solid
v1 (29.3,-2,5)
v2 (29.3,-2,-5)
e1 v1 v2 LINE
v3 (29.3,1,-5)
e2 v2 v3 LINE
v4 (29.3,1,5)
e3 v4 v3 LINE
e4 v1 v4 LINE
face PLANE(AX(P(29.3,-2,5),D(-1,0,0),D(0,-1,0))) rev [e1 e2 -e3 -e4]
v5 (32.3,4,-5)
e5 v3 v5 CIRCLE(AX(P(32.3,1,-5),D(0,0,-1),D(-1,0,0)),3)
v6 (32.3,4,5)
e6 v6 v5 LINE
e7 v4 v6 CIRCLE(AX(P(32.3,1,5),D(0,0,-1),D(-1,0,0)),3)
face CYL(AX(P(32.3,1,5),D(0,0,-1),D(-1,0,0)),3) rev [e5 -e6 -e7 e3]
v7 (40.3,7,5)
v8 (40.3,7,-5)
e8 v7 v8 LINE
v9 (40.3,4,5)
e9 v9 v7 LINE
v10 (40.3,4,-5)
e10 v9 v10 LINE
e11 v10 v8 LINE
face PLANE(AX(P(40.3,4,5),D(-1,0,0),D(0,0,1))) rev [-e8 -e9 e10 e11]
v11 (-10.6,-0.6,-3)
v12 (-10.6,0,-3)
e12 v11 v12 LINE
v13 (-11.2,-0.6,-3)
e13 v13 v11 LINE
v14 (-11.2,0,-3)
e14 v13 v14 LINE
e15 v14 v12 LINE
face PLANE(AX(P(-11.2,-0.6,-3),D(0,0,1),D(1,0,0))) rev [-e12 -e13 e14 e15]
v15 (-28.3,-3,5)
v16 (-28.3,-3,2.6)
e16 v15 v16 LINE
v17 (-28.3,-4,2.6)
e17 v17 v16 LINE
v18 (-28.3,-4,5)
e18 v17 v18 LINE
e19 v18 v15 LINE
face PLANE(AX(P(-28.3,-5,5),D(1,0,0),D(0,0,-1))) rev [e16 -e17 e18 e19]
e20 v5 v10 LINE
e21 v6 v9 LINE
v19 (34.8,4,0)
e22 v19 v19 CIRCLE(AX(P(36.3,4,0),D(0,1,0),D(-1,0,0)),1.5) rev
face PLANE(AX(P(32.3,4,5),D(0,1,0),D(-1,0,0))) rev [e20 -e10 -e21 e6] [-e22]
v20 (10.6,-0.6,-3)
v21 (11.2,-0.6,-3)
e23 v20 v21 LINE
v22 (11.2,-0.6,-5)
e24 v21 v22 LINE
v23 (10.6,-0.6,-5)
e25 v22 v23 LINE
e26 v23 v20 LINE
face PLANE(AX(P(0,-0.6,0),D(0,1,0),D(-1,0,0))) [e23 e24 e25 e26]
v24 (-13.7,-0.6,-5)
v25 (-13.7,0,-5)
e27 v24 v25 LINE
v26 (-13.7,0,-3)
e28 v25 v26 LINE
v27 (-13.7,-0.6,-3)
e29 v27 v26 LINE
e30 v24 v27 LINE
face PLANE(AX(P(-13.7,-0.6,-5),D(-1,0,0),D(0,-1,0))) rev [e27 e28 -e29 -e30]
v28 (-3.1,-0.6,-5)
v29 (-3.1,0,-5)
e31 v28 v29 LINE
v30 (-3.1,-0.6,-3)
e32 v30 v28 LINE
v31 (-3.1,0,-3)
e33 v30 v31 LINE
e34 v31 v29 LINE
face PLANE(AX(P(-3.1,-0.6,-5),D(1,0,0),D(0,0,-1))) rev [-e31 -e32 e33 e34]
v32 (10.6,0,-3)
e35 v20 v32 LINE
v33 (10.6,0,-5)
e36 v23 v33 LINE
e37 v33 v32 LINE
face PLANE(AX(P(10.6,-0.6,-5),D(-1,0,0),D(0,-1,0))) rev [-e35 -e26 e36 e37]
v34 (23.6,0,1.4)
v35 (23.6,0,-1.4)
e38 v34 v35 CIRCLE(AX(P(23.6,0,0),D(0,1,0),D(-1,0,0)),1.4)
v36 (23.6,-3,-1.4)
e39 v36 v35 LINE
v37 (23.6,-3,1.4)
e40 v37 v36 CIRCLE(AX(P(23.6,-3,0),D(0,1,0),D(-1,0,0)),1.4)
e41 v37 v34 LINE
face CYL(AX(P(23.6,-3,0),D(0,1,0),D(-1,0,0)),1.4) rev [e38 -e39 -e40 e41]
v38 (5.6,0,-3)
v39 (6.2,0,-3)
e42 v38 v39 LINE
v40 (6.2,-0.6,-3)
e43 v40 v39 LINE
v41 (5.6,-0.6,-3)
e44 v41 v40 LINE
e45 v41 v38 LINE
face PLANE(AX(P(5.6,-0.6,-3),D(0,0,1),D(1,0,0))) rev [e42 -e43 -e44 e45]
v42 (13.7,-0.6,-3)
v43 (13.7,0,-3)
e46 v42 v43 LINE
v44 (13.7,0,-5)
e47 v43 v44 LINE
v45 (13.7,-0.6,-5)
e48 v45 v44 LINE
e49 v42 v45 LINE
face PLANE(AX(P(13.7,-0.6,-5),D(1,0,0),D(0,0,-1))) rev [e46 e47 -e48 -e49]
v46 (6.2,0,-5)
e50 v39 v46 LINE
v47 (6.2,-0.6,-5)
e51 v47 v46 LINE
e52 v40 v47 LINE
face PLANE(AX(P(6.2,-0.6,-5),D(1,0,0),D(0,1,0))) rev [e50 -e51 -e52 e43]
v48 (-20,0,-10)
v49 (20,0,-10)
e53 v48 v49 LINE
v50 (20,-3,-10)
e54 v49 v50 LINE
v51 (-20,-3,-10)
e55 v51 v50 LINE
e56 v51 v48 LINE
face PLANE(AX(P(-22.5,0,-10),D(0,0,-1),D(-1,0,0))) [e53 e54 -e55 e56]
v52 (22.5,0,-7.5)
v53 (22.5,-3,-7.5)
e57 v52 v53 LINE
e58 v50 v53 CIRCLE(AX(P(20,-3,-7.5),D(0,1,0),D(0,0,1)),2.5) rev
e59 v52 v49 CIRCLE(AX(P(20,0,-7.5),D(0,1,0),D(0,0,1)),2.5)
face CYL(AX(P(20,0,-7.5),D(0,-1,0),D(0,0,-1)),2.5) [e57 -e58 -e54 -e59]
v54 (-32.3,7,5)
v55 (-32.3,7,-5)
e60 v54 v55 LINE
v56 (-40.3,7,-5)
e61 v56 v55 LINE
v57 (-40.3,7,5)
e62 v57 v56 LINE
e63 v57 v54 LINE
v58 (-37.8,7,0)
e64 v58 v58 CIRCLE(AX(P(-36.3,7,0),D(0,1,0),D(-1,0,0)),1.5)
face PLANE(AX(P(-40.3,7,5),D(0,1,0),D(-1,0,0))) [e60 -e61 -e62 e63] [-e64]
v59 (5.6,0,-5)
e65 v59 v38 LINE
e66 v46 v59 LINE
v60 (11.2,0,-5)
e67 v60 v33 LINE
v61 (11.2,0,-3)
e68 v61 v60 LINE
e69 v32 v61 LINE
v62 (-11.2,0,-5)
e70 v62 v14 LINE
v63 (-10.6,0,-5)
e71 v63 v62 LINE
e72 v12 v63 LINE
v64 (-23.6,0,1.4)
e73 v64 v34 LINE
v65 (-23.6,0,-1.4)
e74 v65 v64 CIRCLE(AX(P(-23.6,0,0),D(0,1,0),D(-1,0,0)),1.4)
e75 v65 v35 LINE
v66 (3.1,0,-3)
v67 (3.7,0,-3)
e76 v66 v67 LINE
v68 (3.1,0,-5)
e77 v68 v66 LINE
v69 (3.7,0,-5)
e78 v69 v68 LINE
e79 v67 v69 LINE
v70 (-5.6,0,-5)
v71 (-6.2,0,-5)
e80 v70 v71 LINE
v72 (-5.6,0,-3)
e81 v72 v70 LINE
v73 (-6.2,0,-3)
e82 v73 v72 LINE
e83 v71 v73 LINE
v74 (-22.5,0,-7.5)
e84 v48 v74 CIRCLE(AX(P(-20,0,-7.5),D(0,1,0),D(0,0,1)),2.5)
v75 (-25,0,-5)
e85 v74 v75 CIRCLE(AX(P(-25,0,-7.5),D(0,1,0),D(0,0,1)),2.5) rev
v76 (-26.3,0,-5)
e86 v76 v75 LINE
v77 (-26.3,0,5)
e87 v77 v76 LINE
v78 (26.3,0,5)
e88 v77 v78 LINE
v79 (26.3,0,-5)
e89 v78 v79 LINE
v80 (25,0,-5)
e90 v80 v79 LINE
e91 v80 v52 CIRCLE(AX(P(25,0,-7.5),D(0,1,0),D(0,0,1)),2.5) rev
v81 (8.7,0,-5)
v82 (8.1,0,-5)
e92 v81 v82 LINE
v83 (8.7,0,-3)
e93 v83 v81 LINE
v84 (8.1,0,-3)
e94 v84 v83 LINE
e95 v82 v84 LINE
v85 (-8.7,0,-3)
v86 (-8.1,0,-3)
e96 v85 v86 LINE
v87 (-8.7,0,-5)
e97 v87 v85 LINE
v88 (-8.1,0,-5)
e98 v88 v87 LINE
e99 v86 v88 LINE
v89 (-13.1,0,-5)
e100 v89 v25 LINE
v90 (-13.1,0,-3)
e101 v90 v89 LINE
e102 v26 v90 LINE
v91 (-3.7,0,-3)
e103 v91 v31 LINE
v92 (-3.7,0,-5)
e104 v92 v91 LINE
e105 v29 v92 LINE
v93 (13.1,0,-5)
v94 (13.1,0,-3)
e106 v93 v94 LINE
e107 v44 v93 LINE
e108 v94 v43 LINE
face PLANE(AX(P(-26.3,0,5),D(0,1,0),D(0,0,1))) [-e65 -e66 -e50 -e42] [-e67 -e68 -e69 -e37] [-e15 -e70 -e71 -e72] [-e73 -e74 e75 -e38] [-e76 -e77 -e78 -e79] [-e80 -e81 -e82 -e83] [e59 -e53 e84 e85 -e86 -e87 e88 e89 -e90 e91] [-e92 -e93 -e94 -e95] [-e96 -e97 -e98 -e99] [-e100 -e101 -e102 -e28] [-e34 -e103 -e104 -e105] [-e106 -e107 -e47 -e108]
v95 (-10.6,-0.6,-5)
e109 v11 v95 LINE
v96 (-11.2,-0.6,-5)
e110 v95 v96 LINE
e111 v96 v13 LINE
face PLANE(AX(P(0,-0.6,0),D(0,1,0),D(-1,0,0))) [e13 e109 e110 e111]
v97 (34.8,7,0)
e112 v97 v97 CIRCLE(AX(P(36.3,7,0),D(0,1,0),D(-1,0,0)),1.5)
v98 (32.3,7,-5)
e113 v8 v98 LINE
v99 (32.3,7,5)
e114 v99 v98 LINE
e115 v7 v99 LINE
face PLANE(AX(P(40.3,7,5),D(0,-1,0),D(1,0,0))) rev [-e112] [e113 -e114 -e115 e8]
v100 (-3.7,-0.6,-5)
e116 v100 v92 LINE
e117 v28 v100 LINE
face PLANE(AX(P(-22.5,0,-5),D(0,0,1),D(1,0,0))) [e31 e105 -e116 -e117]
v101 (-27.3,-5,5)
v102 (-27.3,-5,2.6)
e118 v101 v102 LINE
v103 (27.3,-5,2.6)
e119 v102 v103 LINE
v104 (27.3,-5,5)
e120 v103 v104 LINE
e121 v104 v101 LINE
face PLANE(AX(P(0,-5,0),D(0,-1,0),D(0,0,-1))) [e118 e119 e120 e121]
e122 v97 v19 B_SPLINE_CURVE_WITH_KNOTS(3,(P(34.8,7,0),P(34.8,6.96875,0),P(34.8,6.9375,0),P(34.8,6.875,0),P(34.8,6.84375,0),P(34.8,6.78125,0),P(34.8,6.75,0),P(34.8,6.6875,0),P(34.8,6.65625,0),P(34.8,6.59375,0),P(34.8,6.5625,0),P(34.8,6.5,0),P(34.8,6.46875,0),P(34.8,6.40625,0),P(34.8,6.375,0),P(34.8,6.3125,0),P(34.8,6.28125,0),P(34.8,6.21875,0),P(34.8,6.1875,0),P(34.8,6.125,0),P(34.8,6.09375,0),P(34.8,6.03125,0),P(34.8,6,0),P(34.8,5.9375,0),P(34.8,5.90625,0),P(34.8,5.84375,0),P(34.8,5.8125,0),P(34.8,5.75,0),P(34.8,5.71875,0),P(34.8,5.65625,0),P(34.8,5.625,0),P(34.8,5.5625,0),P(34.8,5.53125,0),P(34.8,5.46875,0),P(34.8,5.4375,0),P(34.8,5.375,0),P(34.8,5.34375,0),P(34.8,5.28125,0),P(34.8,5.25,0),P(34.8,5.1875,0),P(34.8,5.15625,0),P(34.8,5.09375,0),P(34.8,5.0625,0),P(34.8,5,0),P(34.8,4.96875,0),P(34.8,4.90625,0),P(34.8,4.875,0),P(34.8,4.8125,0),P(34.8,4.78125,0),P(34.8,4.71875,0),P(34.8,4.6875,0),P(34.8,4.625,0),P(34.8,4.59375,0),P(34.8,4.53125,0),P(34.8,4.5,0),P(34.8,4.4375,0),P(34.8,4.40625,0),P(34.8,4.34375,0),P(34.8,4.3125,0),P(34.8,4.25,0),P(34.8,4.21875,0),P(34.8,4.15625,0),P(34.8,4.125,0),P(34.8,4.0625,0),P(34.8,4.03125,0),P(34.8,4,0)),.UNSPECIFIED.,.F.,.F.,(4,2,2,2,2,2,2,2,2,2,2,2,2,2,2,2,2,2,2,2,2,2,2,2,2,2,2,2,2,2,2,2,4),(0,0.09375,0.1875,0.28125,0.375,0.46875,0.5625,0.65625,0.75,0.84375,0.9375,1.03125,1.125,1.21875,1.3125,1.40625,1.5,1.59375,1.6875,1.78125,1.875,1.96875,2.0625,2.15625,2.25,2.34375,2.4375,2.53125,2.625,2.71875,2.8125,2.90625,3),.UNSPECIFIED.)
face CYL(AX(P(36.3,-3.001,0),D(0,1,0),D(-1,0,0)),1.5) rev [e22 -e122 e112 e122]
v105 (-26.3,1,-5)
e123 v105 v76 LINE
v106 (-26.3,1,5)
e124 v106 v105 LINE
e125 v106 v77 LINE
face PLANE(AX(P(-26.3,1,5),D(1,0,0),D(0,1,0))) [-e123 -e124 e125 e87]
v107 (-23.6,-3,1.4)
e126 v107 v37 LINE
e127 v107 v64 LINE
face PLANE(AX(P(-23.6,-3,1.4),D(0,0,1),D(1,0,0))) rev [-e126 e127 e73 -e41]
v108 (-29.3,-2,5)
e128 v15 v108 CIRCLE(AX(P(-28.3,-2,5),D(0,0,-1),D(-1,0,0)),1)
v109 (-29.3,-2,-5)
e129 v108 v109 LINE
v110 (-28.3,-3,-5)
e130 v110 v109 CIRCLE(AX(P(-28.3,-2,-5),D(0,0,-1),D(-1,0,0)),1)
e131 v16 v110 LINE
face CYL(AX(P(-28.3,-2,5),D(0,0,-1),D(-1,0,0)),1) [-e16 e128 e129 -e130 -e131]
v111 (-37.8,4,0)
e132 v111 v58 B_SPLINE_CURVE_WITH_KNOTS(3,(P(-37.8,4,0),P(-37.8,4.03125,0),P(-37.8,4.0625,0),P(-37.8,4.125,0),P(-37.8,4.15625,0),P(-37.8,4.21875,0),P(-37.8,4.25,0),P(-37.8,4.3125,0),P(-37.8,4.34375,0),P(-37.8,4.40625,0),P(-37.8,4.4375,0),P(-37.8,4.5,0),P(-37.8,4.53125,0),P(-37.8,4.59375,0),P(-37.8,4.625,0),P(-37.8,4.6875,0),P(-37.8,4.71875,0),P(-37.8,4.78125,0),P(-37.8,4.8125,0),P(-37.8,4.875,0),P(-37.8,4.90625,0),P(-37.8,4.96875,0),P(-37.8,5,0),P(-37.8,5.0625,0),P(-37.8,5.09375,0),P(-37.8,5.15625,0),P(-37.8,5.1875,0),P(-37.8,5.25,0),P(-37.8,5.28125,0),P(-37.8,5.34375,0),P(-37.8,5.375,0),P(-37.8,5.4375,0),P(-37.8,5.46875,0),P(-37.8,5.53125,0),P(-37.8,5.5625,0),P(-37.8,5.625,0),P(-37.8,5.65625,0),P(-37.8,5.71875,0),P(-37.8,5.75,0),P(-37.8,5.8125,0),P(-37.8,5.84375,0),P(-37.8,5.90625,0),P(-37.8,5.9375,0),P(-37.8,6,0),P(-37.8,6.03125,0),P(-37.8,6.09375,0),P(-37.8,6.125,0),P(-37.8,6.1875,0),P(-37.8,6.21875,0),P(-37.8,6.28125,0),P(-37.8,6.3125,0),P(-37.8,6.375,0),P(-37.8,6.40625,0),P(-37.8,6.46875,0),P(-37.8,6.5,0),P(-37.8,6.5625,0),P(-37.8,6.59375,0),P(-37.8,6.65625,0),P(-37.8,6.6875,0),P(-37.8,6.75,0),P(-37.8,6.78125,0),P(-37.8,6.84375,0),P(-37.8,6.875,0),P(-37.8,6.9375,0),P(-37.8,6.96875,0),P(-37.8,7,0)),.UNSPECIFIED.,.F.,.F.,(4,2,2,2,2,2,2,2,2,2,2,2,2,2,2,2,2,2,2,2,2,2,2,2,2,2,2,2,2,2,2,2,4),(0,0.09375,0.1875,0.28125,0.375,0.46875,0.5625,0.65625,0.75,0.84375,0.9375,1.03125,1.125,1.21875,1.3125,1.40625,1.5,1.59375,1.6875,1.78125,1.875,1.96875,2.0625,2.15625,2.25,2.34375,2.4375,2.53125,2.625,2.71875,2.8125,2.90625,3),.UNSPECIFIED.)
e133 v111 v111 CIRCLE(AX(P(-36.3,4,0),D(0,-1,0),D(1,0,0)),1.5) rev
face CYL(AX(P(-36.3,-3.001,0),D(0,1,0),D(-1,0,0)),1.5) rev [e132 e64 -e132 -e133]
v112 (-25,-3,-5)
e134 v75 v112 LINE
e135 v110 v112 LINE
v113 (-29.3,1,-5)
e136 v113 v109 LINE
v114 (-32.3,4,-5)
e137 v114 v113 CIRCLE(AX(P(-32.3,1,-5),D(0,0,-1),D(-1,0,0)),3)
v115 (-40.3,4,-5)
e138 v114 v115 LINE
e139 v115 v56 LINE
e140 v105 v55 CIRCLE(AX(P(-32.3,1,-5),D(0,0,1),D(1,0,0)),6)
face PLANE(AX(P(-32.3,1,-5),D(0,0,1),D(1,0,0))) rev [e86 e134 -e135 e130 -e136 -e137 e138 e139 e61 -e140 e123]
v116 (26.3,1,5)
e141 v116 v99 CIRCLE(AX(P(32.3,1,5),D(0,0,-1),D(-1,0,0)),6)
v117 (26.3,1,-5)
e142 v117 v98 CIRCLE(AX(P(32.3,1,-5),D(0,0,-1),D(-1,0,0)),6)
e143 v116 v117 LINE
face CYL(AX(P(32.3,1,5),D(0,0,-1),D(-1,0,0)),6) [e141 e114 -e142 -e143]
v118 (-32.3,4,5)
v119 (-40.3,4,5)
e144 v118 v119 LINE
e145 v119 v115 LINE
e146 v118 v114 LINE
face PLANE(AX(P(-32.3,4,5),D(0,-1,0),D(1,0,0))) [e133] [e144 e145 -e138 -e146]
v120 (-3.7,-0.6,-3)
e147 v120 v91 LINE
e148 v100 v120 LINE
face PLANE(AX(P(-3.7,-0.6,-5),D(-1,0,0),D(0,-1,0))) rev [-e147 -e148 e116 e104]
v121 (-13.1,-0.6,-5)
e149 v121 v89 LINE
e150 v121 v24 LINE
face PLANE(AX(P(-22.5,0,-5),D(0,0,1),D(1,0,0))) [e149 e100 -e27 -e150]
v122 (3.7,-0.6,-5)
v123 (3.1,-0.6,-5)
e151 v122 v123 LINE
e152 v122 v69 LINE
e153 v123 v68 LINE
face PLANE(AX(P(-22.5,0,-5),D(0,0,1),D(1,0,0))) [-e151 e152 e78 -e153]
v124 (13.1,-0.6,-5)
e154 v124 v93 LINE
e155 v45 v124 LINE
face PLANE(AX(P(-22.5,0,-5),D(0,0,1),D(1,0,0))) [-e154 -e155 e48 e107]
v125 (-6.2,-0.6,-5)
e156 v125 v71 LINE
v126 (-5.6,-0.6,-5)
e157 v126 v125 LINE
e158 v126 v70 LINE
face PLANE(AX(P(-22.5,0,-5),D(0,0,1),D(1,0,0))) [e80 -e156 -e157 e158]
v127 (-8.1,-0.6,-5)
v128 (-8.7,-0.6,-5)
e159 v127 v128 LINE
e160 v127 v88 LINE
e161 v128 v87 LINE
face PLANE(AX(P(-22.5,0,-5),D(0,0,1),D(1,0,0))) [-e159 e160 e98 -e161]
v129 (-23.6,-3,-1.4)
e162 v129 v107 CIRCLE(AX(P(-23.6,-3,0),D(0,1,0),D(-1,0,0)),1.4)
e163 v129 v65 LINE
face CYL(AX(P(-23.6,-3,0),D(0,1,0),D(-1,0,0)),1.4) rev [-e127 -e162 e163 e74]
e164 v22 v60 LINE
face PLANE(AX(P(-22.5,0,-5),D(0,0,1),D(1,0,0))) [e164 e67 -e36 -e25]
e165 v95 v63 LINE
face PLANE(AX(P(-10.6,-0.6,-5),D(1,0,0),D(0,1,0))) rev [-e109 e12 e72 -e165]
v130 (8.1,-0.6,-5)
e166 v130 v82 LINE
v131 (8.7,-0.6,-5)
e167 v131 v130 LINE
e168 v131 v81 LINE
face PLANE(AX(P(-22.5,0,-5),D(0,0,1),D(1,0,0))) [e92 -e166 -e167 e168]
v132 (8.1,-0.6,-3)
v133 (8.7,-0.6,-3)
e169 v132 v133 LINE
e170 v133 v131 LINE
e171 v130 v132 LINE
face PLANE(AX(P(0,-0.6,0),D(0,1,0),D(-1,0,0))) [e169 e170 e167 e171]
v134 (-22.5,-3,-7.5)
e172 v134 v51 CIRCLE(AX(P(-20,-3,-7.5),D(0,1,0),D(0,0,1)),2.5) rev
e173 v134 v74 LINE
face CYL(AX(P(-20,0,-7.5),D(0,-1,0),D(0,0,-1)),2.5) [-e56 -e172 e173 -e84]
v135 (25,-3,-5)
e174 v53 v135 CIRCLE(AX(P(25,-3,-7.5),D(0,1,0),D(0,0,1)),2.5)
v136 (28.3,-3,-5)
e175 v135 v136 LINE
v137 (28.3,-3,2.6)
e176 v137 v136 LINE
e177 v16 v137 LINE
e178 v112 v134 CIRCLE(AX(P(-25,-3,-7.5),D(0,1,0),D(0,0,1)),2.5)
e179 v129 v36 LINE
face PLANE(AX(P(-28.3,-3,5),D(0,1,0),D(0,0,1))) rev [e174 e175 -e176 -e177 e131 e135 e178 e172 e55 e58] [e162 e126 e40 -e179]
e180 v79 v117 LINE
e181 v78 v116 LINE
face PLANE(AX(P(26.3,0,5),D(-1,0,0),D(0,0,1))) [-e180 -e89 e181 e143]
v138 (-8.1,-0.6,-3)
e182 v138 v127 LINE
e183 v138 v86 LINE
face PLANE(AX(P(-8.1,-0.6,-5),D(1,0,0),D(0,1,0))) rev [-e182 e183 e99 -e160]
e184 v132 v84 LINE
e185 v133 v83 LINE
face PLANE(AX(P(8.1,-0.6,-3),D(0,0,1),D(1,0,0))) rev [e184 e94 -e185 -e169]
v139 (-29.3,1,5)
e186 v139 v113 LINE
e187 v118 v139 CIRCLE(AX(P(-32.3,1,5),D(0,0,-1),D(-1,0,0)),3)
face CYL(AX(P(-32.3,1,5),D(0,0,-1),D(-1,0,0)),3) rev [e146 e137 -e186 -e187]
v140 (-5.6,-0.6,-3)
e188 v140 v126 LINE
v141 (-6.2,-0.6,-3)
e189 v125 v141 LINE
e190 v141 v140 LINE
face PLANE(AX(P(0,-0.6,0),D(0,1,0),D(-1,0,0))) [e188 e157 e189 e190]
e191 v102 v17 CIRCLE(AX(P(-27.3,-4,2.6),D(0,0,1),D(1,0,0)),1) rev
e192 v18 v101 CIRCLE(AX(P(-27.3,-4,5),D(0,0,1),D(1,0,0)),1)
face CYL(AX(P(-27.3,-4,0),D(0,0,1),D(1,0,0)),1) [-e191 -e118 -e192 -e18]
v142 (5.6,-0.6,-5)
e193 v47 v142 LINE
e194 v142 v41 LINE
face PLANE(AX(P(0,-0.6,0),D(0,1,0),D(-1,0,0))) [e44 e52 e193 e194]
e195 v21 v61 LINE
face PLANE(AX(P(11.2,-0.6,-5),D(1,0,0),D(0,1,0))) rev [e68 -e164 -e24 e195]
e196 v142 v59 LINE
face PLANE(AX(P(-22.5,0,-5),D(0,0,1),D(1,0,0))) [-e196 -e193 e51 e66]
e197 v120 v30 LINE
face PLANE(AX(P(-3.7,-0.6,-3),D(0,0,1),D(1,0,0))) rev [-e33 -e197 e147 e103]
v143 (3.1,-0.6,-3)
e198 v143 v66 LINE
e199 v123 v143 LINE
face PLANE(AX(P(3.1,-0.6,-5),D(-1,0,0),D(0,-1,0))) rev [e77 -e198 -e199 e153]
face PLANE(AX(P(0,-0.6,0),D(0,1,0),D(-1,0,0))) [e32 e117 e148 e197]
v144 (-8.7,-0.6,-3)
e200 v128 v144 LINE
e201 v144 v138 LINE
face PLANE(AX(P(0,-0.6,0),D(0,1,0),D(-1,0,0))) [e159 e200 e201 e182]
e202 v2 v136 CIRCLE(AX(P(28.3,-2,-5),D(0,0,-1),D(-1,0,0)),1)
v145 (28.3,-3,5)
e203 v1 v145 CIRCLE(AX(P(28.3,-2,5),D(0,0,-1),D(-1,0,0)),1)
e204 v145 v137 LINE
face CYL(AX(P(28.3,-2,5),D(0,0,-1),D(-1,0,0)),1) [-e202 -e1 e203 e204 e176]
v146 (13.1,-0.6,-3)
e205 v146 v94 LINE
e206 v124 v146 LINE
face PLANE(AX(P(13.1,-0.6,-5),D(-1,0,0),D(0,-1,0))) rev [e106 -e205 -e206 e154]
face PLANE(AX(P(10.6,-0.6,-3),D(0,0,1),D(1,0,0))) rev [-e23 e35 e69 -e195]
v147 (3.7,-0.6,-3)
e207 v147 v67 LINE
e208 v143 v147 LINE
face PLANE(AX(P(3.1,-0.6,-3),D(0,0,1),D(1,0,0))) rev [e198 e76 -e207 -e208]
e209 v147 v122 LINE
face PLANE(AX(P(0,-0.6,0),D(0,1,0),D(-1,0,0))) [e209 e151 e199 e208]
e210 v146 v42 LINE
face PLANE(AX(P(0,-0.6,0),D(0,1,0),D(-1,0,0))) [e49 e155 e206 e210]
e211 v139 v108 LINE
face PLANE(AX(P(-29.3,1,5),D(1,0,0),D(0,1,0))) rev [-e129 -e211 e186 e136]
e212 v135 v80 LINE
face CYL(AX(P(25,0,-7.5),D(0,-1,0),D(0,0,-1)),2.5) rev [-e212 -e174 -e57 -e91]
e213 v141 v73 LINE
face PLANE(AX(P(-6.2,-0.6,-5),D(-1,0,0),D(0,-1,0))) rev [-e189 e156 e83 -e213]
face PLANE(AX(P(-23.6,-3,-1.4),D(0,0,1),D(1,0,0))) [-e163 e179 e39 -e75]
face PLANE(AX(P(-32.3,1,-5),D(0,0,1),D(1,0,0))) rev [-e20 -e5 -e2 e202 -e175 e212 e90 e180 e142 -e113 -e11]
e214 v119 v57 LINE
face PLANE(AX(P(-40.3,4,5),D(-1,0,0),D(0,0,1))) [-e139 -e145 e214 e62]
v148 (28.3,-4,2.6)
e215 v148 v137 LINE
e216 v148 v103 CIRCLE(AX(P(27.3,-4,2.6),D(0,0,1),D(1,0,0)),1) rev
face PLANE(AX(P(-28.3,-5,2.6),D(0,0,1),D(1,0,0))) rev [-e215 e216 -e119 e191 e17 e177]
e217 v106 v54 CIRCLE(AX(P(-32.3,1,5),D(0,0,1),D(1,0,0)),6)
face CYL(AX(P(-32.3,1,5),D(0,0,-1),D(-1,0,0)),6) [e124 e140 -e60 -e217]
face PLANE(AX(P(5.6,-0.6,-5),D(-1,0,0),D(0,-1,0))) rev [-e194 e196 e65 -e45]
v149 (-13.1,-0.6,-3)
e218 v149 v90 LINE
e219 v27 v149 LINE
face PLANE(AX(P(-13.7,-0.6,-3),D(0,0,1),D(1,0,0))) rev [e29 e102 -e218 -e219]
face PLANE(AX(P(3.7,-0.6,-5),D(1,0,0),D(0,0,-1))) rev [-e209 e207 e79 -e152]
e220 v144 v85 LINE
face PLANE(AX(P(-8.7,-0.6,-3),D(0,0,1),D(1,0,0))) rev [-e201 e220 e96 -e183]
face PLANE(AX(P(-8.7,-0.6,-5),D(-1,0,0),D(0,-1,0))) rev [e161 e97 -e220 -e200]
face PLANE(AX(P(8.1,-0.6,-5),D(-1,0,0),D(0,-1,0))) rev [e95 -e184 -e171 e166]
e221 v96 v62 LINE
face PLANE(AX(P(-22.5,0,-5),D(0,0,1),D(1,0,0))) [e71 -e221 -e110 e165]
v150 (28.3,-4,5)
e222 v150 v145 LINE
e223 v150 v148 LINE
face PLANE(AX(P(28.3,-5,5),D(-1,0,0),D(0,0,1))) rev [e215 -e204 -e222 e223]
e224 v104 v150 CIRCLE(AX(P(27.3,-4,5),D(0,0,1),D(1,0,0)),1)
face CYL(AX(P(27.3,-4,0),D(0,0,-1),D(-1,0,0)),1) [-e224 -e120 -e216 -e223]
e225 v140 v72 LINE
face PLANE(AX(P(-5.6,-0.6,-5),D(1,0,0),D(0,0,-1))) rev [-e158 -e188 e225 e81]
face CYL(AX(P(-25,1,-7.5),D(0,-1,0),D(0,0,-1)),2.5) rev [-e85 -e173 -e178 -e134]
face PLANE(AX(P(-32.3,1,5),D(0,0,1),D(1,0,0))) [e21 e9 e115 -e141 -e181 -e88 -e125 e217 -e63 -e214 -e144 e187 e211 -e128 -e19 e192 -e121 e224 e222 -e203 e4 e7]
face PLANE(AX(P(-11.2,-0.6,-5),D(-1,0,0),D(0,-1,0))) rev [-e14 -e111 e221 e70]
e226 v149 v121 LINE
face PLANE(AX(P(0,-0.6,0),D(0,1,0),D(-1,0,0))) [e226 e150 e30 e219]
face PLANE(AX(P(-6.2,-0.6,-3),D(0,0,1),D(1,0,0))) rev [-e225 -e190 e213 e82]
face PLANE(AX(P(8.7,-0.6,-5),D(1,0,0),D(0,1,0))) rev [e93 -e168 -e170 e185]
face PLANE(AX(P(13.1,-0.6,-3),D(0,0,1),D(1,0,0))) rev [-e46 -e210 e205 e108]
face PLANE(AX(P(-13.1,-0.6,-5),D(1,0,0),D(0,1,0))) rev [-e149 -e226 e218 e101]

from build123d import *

# Parameters (mm, degrees)
BOSS_EXTRUDE1_DEPTH = 5
CUT_EXTRUDE1_DEPTH  = 42.207887594
CUT_EXTRUDE2_REACH  = 43.822
SKETCH5_R           = 1.5
SKETCH6_W           = 0.6
SKETCH6_H           = 2
CUT_EXTRUDE3_DEPTH  = 0.6
SKETCH8_W           = 56.6
SKETCH8_H           = 2.4
BOSS_EXTRUDE2_DEPTH = 2
SKETCH9_W           = 45
SKETCH9_H           = 5
BOSS_EXTRUDE3_DEPTH = 3
FILLET1_START       = -3
FILLET1_DEPTH       = 10
FILLET1_2_DEPTH     = 3
FILLET2_R           = 1


with BuildPart() as part:
    # Sketch1 → Boss-Extrude1 (new, symmetric)
    with BuildSketch(Plane.XY):
        with BuildLine():
            Line((-26.3, 1), (-26.3, 0))
            Line((-26.3, 0), (26.3, 0))
            Line((26.3, 0), (26.3, 1))
            ThreePointArc((26.3, 1), (28.057359313, 5.242640687), (32.3, 7))
            Line((32.3, 7), (40.3, 7))
            Line((40.3, 7), (40.3, 4))
            Line((40.3, 4), (32.3, 4))
            ThreePointArc((32.3, 4), (30.178679656, 3.121320344), (29.3, 1))
            Line((29.3, 1), (29.3, -2))
            ThreePointArc((29.3, -2), (29.007106781, -2.707106781), (28.3, -3))
            Line((28.3, -3), (-28.3, -3))
            ThreePointArc((-28.3, -3), (-29.007106781, -2.707106781), (-29.3, -2))
            Line((-29.3, -2), (-29.3, 1))
            ThreePointArc((-29.3, 1), (-30.178679656, 3.121320344), (-32.3, 4))
            Line((-32.3, 4), (-40.3, 4))
            Line((-40.3, 4), (-40.3, 7))
            Line((-40.3, 7), (-32.3, 7))
            ThreePointArc((-32.3, 7), (-28.057359313, 5.242640687), (-26.3, 1))
        make_face()
    extrude(amount=BOSS_EXTRUDE1_DEPTH, both=True)

    # Sketch3 → Cut-Extrude1 (cut, through all)
    with BuildSketch(Plane(origin=(0, 0, 0), x_dir=(1, 0, 0), z_dir=(0, 1, 0))):
        with BuildLine():
            Line((-23.6, 1.4), (23.6, 1.4))
            ThreePointArc((23.6, 1.4), (25, 0), (23.6, -1.4))
            Line((23.6, -1.4), (-23.6, -1.4))
            ThreePointArc((-23.6, -1.4), (-25, 0), (-23.6, 1.4))
        make_face()
    extrude(amount=-CUT_EXTRUDE1_DEPTH, mode=Mode.SUBTRACT)

    # Sketch5 → Cut-Extrude2 (cut, up to next)
    with BuildSketch(Plane(origin=(0, 7, 0), x_dir=(1, 0, 0), z_dir=(0, 1, 0)), mode=Mode.PRIVATE) as cut_extrude2_sk1:
        with Locations(Location((-36.3, 0, 0), (0, 0, 180))):
            Circle(SKETCH5_R)
    cut_extrude2_tool1 = extrude(cut_extrude2_sk1.sketch, amount=-CUT_EXTRUDE2_REACH, mode=Mode.PRIVATE) & part.part
    # Sketch5 → Cut-Extrude2 (cut, up to next)
    with BuildSketch(Plane(origin=(0, 7, 0), x_dir=(1, 0, 0), z_dir=(0, 1, 0)), mode=Mode.PRIVATE) as cut_extrude2_sk2:
        with Locations(Location((36.3, 0, 0), (0, 0, 180))):
            Circle(SKETCH5_R)
    cut_extrude2_tool2 = extrude(cut_extrude2_sk2.sketch, amount=-CUT_EXTRUDE2_REACH, mode=Mode.PRIVATE) & part.part
    add(cut_extrude2_tool1.solids().sort_by_distance((-36.3, 7, 0))[0], mode=Mode.SUBTRACT)
    add(cut_extrude2_tool2.solids().sort_by_distance((36.3, 7, 0))[0], mode=Mode.SUBTRACT)

    # Sketch6 → Cut-Extrude3 (cut)
    with BuildSketch(Plane(origin=(0, 0, 0), x_dir=(1, 0, 0), z_dir=(0, 1, 0))):
        with Locations((-5.9, 4)):
            Rectangle(SKETCH6_W, SKETCH6_H)
        with Locations((-3.4, 4)):
            Rectangle(SKETCH6_W, SKETCH6_H)
        with Locations((3.4, 4)):
            Rectangle(SKETCH6_W, SKETCH6_H)
        with Locations((-8.4, 4)):
            Rectangle(SKETCH6_W, SKETCH6_H)
        with Locations((-10.9, 4)):
            Rectangle(SKETCH6_W, SKETCH6_H)
        with Locations((-13.4, 4)):
            Rectangle(SKETCH6_W, SKETCH6_H)
        with Locations((5.9, 4)):
            Rectangle(SKETCH6_W, SKETCH6_H)
        with Locations((8.4, 4)):
            Rectangle(SKETCH6_W, SKETCH6_H)
        with Locations((10.9, 4)):
            Rectangle(SKETCH6_W, SKETCH6_H)
        with Locations((13.4, 4)):
            Rectangle(SKETCH6_W, SKETCH6_H)
    extrude(amount=-CUT_EXTRUDE3_DEPTH, mode=Mode.SUBTRACT)

    # Sketch8 → Boss-Extrude2 (add)
    with BuildSketch(Plane.XZ.offset(3)):
        with Locations((0, 3.8)):
            Rectangle(SKETCH8_W, SKETCH8_H)
    extrude(amount=BOSS_EXTRUDE2_DEPTH)

    # Sketch9 → Boss-Extrude3 (add)
    with BuildSketch(Plane.XZ.offset(3)):
        with Locations((0, -7.5)):
            Rectangle(SKETCH9_W, SKETCH9_H)
    extrude(amount=-BOSS_EXTRUDE3_DEPTH)

    # Fillet1: read off the stored shape, not the designer's step
    # Fillet1 outline → Fillet1 (cut)
    with BuildSketch(Plane(origin=(0, 0, 0), x_dir=(1, 0, 0), z_dir=(0, 1, 0)).offset(FILLET1_START)):
        with BuildLine():
            Line((-22.5, 10), (-22.5, 7.5))
            ThreePointArc((-22.5, 7.5), (-21.767766953, 9.267766953), (-20, 10))
            Line((-20, 10), (-22.5, 10))
        make_face()
        with BuildLine():
            Line((22.5, 10), (20, 10))
            ThreePointArc((20, 10), (21.767766953, 9.267766953), (22.5, 7.5))
            Line((22.5, 7.5), (22.5, 10))
        make_face()
    extrude(amount=FILLET1_DEPTH, mode=Mode.SUBTRACT)

    # Fillet1 2 outline → Fillet1 2 (add)
    with BuildSketch(Plane(origin=(0, 0, 0), x_dir=(1, 0, 0), z_dir=(0, 1, 0)).offset(FILLET1_START)):
        with BuildLine():
            Line((-22.5, 5), (-22.5, 7.5))
            ThreePointArc((-22.5, 7.5), (-23.232233047, 5.732233047), (-25, 5))
            Line((-25, 5), (-22.5, 5))
        make_face()
        with BuildLine():
            ThreePointArc((25, 5), (23.232233047, 5.732233047), (22.5, 7.5))
            Line((22.5, 7.5), (22.5, 5))
            Line((22.5, 5), (25, 5))
        make_face()
    extrude(amount=FILLET1_2_DEPTH)

    # Fillet2
    fillet2_edges = [part.edges().sort_by_distance(p)[0] for p in [
        (-28.3, -5, 3.8),
        (28.3, -5, 3.8),
    ]]
    fillet(fillet2_edges, radius=FILLET2_R)


solid = part.part
